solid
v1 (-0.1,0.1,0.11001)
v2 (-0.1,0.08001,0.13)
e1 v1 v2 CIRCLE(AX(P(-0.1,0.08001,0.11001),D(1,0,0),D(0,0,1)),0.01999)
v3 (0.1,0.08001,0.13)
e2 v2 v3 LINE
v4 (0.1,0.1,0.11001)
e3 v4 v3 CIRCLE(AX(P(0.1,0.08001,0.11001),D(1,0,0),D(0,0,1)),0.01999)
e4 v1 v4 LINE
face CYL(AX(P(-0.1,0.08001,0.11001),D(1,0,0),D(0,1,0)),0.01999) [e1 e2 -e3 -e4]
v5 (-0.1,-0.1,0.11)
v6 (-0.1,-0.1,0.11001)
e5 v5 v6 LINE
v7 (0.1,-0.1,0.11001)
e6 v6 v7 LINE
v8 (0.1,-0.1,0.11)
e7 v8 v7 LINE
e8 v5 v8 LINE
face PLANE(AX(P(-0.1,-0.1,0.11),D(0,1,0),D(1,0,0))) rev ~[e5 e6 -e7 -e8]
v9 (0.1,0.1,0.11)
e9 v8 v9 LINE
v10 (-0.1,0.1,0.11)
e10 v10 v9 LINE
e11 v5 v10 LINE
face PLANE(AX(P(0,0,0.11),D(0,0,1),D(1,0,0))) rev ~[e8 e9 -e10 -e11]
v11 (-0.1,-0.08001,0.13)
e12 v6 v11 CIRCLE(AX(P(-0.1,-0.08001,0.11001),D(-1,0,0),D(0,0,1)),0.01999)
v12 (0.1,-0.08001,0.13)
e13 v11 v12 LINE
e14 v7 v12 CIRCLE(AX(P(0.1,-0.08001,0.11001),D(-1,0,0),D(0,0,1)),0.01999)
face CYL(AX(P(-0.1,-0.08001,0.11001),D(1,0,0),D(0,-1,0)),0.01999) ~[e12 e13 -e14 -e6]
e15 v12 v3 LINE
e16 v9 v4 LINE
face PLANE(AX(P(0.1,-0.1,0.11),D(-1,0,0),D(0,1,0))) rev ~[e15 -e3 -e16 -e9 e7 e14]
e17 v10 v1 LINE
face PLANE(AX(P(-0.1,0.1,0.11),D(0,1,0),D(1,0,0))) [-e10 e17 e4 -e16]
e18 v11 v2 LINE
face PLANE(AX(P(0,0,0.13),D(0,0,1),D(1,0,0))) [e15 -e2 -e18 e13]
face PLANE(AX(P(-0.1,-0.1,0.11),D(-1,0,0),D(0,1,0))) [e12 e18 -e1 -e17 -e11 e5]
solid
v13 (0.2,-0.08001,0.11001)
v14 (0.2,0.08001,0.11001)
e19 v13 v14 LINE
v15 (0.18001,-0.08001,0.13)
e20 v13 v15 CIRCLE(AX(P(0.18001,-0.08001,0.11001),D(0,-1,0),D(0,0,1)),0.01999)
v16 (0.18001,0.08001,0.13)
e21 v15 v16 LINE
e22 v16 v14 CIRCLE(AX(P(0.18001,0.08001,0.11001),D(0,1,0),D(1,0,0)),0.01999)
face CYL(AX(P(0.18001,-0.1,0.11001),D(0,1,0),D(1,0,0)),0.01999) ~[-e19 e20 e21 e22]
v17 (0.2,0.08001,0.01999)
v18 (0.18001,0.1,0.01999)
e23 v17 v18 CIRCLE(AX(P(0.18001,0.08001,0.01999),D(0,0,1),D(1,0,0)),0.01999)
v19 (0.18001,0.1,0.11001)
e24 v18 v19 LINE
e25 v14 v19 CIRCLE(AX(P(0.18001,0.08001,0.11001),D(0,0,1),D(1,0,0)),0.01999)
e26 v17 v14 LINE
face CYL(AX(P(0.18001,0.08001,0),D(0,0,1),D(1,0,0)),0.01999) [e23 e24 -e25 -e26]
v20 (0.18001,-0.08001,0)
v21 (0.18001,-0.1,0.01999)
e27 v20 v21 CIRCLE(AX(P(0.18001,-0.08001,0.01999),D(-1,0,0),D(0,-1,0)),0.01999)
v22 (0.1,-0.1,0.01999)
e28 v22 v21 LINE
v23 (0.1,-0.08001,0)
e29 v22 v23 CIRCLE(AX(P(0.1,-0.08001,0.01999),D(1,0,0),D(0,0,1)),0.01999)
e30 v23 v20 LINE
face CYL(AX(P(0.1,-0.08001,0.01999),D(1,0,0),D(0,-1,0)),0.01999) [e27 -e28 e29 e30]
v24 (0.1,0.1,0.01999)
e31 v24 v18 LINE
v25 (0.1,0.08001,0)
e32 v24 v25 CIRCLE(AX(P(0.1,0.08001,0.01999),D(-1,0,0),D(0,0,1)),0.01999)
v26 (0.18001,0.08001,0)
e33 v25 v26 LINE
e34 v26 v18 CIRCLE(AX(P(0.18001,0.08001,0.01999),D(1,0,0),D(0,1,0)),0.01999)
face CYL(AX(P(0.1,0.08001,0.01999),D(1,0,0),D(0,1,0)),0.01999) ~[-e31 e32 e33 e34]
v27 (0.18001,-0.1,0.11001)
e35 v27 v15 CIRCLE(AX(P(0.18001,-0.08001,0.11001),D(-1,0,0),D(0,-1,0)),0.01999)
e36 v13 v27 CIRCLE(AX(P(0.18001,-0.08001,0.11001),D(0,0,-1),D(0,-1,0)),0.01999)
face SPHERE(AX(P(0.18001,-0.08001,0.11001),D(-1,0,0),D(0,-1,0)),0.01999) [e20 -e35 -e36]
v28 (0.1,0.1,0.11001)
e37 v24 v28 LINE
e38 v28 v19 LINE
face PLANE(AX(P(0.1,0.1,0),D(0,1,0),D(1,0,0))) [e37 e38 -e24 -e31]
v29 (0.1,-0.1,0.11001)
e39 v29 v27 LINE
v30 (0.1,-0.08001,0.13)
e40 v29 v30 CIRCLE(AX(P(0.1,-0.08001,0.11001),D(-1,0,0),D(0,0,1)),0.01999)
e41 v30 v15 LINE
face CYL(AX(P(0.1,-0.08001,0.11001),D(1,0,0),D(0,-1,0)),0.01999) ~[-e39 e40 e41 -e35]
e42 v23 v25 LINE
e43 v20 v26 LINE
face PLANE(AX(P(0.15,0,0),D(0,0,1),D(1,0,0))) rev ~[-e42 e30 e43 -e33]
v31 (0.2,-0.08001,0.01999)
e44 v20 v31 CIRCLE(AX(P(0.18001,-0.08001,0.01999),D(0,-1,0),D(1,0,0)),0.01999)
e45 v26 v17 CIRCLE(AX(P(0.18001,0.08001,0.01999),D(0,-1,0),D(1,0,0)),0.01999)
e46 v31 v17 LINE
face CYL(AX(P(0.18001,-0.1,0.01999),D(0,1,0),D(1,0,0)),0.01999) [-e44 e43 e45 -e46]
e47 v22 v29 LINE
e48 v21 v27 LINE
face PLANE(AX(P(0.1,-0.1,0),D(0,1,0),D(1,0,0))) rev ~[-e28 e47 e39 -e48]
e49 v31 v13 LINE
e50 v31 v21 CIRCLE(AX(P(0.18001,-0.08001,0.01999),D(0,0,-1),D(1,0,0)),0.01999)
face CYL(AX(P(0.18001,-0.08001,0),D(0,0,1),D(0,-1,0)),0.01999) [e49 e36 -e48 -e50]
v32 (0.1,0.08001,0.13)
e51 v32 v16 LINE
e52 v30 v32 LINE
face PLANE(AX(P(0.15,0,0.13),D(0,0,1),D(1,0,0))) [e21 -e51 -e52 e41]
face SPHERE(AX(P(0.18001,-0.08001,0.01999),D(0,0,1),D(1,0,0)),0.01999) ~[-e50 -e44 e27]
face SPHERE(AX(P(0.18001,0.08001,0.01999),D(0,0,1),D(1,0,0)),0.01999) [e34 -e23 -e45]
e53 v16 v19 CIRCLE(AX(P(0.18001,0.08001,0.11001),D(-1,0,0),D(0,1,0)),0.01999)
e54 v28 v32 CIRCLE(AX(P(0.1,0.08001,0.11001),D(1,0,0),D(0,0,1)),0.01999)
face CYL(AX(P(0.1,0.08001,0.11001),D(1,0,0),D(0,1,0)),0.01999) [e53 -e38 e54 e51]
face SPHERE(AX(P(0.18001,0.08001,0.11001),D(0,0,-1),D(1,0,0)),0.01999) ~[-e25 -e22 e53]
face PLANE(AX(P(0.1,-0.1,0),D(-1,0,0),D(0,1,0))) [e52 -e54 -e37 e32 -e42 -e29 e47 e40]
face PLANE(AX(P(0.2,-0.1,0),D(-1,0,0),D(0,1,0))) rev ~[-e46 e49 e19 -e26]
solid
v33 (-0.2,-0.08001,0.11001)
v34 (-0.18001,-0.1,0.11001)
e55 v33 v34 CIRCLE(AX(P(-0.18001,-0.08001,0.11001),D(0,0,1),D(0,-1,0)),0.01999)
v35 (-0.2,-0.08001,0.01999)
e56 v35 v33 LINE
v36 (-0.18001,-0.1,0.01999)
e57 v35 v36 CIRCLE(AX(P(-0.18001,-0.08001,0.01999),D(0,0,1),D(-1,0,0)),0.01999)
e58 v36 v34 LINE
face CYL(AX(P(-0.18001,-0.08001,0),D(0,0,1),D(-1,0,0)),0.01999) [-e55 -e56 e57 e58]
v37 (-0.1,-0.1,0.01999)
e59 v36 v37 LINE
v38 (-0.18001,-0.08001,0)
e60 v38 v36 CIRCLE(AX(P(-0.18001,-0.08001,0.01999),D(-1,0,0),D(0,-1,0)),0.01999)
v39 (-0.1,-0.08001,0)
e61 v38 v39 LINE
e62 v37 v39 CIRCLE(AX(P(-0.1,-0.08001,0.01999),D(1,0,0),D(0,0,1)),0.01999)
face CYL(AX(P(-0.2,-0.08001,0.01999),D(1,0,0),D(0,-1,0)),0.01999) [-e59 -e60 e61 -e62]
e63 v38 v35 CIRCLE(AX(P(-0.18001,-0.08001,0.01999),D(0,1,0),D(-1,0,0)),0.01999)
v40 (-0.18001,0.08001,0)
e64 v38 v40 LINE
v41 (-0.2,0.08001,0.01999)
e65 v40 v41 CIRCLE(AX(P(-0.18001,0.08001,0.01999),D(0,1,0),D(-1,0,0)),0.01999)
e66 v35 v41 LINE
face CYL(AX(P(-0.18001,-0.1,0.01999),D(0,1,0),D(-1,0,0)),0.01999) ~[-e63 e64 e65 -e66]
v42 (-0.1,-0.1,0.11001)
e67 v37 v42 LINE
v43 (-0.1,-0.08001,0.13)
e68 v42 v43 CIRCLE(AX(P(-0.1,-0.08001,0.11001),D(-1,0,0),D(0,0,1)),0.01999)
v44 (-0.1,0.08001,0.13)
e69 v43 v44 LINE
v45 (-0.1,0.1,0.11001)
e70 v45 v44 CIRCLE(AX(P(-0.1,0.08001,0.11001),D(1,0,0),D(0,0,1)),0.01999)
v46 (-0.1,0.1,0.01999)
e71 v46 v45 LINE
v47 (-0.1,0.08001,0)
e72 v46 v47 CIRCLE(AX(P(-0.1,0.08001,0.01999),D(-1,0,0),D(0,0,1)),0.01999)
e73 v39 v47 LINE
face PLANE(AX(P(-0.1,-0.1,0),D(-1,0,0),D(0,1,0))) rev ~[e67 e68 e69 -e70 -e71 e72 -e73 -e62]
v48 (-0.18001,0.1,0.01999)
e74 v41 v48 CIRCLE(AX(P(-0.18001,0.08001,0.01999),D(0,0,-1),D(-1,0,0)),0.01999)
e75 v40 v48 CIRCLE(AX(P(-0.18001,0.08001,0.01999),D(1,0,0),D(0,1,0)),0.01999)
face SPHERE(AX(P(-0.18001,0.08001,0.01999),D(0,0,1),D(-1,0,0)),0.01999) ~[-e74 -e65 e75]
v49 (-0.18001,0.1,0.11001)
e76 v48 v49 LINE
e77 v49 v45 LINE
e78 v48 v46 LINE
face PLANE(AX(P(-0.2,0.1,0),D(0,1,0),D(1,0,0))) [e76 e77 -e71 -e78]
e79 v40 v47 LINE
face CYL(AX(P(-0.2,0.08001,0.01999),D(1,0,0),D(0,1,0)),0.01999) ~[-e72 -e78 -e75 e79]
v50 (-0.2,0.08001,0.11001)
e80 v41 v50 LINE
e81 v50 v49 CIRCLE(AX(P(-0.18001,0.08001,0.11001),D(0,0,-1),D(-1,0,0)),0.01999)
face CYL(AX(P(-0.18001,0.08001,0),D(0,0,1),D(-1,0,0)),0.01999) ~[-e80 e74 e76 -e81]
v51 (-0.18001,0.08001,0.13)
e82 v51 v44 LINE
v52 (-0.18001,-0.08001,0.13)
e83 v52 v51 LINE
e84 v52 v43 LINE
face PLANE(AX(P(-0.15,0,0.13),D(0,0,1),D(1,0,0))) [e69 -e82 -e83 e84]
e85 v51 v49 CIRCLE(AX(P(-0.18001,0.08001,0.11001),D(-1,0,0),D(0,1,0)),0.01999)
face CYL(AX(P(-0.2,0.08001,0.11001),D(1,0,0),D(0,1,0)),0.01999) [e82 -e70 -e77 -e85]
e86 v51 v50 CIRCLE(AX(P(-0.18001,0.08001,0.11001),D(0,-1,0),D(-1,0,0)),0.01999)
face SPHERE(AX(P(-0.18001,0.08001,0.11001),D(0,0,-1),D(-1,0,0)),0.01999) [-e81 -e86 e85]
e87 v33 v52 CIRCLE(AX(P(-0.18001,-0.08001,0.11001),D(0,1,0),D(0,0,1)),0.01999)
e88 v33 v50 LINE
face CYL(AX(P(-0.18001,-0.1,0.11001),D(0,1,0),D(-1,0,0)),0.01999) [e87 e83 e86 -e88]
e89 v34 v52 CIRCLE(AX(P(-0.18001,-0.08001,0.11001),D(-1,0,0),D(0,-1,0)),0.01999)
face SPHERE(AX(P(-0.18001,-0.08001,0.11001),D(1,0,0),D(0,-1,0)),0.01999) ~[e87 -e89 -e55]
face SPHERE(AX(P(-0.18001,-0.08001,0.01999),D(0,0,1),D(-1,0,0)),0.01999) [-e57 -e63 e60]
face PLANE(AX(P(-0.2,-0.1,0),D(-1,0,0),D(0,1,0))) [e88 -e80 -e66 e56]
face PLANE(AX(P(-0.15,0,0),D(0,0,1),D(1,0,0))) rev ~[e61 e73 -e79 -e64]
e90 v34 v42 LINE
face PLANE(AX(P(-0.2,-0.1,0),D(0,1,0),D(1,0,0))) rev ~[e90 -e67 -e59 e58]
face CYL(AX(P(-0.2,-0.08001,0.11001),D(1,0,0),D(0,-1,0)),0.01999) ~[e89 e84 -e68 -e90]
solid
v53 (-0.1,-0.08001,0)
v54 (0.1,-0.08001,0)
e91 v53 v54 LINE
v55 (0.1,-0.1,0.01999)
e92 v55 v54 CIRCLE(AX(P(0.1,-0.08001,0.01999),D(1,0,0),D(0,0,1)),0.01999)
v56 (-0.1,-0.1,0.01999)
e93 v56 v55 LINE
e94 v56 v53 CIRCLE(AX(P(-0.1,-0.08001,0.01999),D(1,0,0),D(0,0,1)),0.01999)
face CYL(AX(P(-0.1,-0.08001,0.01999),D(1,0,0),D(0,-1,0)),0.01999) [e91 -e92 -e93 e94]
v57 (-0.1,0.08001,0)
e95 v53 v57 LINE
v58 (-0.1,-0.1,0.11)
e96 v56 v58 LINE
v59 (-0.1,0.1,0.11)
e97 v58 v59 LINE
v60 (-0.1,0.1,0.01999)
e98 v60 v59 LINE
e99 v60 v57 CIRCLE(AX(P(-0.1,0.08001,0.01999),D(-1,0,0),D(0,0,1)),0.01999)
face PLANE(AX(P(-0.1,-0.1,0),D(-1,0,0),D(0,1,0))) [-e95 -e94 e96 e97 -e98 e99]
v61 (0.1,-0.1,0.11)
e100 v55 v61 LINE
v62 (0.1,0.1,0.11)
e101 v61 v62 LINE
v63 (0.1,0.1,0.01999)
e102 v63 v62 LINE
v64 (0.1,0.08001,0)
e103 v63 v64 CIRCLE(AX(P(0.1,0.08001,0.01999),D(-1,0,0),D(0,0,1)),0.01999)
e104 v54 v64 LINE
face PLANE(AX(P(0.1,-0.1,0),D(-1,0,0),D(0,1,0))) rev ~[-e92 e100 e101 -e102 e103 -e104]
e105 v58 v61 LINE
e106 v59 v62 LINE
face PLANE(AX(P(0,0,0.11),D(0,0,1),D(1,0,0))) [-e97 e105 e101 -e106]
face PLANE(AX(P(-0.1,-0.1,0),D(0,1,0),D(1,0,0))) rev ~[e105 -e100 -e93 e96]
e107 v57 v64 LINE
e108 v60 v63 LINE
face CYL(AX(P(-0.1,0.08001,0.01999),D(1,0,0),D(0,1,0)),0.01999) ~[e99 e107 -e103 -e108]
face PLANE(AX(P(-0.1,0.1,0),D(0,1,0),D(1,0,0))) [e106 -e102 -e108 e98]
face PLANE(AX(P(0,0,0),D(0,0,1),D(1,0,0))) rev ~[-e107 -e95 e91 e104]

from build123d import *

# Parameters (mm, degrees)
F2_W     = 0.2
F2_H     = 0.2
F3_DEPTH = 0.11
F2_W_2   = 0.1
F4_DEPTH = 0.13
F5_DEPTH = 0.13
F6_DEPTH = 0.02
F7_R     = 0.01999
F7_2_R   = 0.01999
F7_3_R   = 0.01999
F7_4_R   = 0.01999


# Not quite as in the source:
# - a fillet or chamfer is up to 0.001 mm smaller than in the source, because OpenCascade refuses the exact size


with BuildPart() as f3:
    # F2 (on Top) → F3 (new body)
    with BuildSketch(Plane.XY):
        Rectangle(F2_W, F2_H)
    extrude(amount=F3_DEPTH)


with BuildPart() as f4:
    # F2 (on Top) → F4 (new body)
    with BuildSketch(Plane.XY):
        with Locations((-0.15, 0)):
            Rectangle(F2_W_2, F2_H)
    extrude(amount=F4_DEPTH)

    # F7 (radius 0.02 in the source; OpenCascade refuses exactly that, so slightly less here)
    f7_edges = [f4.edges().sort_by_distance(p)[0] for p in [
        (-0.15, -0.1, 0.13),
        (-0.2, 0.1, 0.065),
        (-0.2, -0.1, 0.065),
        (-0.2, 0, 0),
        (-0.2, 0, 0.13),
        (-0.15, 0.1, 0.13),
        (-0.15, 0.1, 0),
        (-0.15, -0.1, 0),
    ]]
    fillet(f7_edges, radius=F7_R)


with BuildPart() as f5:
    # F2 (on Top) → F5 (new body)
    with BuildSketch(Plane.XY):
        with Locations((0.15, 0)):
            Rectangle(F2_W_2, F2_H)
    extrude(amount=F5_DEPTH)

    # F7#2 (radius 0.02 in the source; OpenCascade refuses exactly that, so slightly less here)
    f7_2_edges = [f5.edges().sort_by_distance(p)[0] for p in [
        (0.15, -0.1, 0.13),
        (0.2, -0.1, 0.065),
        (0.2, 0.1, 0.065),
        (0.2, 0, 0),
        (0.2, 0, 0.13),
        (0.15, 0.1, 0.13),
        (0.15, 0.1, 0),
        (0.15, -0.1, 0),
    ]]
    fillet(f7_2_edges, radius=F7_2_R)


with BuildPart() as f6:
    # F6 (new): a face of the model
    f6_faces = [f3.part.faces().sort_by_distance(p)[0] for p in [
        (0, 0, 0.11),
    ]]
    extrude(f6_faces, amount=F6_DEPTH)

    # F7#4 (radius 0.02 in the source; OpenCascade refuses exactly that, so slightly less here)
    f7_4_edges = [f6.edges().sort_by_distance(p)[0] for p in [
        (0, -0.1, 0.13),
        (0, 0.1, 0.13),
    ]]
    fillet(f7_4_edges, radius=F7_4_R)


with BuildPart() as f3_1:
    add(f3.part)

    # F7#3 (radius 0.02 in the source; OpenCascade refuses exactly that, so slightly less here)
    f7_3_edges = [f3_1.edges().sort_by_distance(p)[0] for p in [
        (0, 0.1, 0),
        (0, -0.1, 0),
    ]]
    fillet(f7_3_edges, radius=F7_3_R)


solid = Compound([f4.part, f5.part, f6.part, f3_1.part])
